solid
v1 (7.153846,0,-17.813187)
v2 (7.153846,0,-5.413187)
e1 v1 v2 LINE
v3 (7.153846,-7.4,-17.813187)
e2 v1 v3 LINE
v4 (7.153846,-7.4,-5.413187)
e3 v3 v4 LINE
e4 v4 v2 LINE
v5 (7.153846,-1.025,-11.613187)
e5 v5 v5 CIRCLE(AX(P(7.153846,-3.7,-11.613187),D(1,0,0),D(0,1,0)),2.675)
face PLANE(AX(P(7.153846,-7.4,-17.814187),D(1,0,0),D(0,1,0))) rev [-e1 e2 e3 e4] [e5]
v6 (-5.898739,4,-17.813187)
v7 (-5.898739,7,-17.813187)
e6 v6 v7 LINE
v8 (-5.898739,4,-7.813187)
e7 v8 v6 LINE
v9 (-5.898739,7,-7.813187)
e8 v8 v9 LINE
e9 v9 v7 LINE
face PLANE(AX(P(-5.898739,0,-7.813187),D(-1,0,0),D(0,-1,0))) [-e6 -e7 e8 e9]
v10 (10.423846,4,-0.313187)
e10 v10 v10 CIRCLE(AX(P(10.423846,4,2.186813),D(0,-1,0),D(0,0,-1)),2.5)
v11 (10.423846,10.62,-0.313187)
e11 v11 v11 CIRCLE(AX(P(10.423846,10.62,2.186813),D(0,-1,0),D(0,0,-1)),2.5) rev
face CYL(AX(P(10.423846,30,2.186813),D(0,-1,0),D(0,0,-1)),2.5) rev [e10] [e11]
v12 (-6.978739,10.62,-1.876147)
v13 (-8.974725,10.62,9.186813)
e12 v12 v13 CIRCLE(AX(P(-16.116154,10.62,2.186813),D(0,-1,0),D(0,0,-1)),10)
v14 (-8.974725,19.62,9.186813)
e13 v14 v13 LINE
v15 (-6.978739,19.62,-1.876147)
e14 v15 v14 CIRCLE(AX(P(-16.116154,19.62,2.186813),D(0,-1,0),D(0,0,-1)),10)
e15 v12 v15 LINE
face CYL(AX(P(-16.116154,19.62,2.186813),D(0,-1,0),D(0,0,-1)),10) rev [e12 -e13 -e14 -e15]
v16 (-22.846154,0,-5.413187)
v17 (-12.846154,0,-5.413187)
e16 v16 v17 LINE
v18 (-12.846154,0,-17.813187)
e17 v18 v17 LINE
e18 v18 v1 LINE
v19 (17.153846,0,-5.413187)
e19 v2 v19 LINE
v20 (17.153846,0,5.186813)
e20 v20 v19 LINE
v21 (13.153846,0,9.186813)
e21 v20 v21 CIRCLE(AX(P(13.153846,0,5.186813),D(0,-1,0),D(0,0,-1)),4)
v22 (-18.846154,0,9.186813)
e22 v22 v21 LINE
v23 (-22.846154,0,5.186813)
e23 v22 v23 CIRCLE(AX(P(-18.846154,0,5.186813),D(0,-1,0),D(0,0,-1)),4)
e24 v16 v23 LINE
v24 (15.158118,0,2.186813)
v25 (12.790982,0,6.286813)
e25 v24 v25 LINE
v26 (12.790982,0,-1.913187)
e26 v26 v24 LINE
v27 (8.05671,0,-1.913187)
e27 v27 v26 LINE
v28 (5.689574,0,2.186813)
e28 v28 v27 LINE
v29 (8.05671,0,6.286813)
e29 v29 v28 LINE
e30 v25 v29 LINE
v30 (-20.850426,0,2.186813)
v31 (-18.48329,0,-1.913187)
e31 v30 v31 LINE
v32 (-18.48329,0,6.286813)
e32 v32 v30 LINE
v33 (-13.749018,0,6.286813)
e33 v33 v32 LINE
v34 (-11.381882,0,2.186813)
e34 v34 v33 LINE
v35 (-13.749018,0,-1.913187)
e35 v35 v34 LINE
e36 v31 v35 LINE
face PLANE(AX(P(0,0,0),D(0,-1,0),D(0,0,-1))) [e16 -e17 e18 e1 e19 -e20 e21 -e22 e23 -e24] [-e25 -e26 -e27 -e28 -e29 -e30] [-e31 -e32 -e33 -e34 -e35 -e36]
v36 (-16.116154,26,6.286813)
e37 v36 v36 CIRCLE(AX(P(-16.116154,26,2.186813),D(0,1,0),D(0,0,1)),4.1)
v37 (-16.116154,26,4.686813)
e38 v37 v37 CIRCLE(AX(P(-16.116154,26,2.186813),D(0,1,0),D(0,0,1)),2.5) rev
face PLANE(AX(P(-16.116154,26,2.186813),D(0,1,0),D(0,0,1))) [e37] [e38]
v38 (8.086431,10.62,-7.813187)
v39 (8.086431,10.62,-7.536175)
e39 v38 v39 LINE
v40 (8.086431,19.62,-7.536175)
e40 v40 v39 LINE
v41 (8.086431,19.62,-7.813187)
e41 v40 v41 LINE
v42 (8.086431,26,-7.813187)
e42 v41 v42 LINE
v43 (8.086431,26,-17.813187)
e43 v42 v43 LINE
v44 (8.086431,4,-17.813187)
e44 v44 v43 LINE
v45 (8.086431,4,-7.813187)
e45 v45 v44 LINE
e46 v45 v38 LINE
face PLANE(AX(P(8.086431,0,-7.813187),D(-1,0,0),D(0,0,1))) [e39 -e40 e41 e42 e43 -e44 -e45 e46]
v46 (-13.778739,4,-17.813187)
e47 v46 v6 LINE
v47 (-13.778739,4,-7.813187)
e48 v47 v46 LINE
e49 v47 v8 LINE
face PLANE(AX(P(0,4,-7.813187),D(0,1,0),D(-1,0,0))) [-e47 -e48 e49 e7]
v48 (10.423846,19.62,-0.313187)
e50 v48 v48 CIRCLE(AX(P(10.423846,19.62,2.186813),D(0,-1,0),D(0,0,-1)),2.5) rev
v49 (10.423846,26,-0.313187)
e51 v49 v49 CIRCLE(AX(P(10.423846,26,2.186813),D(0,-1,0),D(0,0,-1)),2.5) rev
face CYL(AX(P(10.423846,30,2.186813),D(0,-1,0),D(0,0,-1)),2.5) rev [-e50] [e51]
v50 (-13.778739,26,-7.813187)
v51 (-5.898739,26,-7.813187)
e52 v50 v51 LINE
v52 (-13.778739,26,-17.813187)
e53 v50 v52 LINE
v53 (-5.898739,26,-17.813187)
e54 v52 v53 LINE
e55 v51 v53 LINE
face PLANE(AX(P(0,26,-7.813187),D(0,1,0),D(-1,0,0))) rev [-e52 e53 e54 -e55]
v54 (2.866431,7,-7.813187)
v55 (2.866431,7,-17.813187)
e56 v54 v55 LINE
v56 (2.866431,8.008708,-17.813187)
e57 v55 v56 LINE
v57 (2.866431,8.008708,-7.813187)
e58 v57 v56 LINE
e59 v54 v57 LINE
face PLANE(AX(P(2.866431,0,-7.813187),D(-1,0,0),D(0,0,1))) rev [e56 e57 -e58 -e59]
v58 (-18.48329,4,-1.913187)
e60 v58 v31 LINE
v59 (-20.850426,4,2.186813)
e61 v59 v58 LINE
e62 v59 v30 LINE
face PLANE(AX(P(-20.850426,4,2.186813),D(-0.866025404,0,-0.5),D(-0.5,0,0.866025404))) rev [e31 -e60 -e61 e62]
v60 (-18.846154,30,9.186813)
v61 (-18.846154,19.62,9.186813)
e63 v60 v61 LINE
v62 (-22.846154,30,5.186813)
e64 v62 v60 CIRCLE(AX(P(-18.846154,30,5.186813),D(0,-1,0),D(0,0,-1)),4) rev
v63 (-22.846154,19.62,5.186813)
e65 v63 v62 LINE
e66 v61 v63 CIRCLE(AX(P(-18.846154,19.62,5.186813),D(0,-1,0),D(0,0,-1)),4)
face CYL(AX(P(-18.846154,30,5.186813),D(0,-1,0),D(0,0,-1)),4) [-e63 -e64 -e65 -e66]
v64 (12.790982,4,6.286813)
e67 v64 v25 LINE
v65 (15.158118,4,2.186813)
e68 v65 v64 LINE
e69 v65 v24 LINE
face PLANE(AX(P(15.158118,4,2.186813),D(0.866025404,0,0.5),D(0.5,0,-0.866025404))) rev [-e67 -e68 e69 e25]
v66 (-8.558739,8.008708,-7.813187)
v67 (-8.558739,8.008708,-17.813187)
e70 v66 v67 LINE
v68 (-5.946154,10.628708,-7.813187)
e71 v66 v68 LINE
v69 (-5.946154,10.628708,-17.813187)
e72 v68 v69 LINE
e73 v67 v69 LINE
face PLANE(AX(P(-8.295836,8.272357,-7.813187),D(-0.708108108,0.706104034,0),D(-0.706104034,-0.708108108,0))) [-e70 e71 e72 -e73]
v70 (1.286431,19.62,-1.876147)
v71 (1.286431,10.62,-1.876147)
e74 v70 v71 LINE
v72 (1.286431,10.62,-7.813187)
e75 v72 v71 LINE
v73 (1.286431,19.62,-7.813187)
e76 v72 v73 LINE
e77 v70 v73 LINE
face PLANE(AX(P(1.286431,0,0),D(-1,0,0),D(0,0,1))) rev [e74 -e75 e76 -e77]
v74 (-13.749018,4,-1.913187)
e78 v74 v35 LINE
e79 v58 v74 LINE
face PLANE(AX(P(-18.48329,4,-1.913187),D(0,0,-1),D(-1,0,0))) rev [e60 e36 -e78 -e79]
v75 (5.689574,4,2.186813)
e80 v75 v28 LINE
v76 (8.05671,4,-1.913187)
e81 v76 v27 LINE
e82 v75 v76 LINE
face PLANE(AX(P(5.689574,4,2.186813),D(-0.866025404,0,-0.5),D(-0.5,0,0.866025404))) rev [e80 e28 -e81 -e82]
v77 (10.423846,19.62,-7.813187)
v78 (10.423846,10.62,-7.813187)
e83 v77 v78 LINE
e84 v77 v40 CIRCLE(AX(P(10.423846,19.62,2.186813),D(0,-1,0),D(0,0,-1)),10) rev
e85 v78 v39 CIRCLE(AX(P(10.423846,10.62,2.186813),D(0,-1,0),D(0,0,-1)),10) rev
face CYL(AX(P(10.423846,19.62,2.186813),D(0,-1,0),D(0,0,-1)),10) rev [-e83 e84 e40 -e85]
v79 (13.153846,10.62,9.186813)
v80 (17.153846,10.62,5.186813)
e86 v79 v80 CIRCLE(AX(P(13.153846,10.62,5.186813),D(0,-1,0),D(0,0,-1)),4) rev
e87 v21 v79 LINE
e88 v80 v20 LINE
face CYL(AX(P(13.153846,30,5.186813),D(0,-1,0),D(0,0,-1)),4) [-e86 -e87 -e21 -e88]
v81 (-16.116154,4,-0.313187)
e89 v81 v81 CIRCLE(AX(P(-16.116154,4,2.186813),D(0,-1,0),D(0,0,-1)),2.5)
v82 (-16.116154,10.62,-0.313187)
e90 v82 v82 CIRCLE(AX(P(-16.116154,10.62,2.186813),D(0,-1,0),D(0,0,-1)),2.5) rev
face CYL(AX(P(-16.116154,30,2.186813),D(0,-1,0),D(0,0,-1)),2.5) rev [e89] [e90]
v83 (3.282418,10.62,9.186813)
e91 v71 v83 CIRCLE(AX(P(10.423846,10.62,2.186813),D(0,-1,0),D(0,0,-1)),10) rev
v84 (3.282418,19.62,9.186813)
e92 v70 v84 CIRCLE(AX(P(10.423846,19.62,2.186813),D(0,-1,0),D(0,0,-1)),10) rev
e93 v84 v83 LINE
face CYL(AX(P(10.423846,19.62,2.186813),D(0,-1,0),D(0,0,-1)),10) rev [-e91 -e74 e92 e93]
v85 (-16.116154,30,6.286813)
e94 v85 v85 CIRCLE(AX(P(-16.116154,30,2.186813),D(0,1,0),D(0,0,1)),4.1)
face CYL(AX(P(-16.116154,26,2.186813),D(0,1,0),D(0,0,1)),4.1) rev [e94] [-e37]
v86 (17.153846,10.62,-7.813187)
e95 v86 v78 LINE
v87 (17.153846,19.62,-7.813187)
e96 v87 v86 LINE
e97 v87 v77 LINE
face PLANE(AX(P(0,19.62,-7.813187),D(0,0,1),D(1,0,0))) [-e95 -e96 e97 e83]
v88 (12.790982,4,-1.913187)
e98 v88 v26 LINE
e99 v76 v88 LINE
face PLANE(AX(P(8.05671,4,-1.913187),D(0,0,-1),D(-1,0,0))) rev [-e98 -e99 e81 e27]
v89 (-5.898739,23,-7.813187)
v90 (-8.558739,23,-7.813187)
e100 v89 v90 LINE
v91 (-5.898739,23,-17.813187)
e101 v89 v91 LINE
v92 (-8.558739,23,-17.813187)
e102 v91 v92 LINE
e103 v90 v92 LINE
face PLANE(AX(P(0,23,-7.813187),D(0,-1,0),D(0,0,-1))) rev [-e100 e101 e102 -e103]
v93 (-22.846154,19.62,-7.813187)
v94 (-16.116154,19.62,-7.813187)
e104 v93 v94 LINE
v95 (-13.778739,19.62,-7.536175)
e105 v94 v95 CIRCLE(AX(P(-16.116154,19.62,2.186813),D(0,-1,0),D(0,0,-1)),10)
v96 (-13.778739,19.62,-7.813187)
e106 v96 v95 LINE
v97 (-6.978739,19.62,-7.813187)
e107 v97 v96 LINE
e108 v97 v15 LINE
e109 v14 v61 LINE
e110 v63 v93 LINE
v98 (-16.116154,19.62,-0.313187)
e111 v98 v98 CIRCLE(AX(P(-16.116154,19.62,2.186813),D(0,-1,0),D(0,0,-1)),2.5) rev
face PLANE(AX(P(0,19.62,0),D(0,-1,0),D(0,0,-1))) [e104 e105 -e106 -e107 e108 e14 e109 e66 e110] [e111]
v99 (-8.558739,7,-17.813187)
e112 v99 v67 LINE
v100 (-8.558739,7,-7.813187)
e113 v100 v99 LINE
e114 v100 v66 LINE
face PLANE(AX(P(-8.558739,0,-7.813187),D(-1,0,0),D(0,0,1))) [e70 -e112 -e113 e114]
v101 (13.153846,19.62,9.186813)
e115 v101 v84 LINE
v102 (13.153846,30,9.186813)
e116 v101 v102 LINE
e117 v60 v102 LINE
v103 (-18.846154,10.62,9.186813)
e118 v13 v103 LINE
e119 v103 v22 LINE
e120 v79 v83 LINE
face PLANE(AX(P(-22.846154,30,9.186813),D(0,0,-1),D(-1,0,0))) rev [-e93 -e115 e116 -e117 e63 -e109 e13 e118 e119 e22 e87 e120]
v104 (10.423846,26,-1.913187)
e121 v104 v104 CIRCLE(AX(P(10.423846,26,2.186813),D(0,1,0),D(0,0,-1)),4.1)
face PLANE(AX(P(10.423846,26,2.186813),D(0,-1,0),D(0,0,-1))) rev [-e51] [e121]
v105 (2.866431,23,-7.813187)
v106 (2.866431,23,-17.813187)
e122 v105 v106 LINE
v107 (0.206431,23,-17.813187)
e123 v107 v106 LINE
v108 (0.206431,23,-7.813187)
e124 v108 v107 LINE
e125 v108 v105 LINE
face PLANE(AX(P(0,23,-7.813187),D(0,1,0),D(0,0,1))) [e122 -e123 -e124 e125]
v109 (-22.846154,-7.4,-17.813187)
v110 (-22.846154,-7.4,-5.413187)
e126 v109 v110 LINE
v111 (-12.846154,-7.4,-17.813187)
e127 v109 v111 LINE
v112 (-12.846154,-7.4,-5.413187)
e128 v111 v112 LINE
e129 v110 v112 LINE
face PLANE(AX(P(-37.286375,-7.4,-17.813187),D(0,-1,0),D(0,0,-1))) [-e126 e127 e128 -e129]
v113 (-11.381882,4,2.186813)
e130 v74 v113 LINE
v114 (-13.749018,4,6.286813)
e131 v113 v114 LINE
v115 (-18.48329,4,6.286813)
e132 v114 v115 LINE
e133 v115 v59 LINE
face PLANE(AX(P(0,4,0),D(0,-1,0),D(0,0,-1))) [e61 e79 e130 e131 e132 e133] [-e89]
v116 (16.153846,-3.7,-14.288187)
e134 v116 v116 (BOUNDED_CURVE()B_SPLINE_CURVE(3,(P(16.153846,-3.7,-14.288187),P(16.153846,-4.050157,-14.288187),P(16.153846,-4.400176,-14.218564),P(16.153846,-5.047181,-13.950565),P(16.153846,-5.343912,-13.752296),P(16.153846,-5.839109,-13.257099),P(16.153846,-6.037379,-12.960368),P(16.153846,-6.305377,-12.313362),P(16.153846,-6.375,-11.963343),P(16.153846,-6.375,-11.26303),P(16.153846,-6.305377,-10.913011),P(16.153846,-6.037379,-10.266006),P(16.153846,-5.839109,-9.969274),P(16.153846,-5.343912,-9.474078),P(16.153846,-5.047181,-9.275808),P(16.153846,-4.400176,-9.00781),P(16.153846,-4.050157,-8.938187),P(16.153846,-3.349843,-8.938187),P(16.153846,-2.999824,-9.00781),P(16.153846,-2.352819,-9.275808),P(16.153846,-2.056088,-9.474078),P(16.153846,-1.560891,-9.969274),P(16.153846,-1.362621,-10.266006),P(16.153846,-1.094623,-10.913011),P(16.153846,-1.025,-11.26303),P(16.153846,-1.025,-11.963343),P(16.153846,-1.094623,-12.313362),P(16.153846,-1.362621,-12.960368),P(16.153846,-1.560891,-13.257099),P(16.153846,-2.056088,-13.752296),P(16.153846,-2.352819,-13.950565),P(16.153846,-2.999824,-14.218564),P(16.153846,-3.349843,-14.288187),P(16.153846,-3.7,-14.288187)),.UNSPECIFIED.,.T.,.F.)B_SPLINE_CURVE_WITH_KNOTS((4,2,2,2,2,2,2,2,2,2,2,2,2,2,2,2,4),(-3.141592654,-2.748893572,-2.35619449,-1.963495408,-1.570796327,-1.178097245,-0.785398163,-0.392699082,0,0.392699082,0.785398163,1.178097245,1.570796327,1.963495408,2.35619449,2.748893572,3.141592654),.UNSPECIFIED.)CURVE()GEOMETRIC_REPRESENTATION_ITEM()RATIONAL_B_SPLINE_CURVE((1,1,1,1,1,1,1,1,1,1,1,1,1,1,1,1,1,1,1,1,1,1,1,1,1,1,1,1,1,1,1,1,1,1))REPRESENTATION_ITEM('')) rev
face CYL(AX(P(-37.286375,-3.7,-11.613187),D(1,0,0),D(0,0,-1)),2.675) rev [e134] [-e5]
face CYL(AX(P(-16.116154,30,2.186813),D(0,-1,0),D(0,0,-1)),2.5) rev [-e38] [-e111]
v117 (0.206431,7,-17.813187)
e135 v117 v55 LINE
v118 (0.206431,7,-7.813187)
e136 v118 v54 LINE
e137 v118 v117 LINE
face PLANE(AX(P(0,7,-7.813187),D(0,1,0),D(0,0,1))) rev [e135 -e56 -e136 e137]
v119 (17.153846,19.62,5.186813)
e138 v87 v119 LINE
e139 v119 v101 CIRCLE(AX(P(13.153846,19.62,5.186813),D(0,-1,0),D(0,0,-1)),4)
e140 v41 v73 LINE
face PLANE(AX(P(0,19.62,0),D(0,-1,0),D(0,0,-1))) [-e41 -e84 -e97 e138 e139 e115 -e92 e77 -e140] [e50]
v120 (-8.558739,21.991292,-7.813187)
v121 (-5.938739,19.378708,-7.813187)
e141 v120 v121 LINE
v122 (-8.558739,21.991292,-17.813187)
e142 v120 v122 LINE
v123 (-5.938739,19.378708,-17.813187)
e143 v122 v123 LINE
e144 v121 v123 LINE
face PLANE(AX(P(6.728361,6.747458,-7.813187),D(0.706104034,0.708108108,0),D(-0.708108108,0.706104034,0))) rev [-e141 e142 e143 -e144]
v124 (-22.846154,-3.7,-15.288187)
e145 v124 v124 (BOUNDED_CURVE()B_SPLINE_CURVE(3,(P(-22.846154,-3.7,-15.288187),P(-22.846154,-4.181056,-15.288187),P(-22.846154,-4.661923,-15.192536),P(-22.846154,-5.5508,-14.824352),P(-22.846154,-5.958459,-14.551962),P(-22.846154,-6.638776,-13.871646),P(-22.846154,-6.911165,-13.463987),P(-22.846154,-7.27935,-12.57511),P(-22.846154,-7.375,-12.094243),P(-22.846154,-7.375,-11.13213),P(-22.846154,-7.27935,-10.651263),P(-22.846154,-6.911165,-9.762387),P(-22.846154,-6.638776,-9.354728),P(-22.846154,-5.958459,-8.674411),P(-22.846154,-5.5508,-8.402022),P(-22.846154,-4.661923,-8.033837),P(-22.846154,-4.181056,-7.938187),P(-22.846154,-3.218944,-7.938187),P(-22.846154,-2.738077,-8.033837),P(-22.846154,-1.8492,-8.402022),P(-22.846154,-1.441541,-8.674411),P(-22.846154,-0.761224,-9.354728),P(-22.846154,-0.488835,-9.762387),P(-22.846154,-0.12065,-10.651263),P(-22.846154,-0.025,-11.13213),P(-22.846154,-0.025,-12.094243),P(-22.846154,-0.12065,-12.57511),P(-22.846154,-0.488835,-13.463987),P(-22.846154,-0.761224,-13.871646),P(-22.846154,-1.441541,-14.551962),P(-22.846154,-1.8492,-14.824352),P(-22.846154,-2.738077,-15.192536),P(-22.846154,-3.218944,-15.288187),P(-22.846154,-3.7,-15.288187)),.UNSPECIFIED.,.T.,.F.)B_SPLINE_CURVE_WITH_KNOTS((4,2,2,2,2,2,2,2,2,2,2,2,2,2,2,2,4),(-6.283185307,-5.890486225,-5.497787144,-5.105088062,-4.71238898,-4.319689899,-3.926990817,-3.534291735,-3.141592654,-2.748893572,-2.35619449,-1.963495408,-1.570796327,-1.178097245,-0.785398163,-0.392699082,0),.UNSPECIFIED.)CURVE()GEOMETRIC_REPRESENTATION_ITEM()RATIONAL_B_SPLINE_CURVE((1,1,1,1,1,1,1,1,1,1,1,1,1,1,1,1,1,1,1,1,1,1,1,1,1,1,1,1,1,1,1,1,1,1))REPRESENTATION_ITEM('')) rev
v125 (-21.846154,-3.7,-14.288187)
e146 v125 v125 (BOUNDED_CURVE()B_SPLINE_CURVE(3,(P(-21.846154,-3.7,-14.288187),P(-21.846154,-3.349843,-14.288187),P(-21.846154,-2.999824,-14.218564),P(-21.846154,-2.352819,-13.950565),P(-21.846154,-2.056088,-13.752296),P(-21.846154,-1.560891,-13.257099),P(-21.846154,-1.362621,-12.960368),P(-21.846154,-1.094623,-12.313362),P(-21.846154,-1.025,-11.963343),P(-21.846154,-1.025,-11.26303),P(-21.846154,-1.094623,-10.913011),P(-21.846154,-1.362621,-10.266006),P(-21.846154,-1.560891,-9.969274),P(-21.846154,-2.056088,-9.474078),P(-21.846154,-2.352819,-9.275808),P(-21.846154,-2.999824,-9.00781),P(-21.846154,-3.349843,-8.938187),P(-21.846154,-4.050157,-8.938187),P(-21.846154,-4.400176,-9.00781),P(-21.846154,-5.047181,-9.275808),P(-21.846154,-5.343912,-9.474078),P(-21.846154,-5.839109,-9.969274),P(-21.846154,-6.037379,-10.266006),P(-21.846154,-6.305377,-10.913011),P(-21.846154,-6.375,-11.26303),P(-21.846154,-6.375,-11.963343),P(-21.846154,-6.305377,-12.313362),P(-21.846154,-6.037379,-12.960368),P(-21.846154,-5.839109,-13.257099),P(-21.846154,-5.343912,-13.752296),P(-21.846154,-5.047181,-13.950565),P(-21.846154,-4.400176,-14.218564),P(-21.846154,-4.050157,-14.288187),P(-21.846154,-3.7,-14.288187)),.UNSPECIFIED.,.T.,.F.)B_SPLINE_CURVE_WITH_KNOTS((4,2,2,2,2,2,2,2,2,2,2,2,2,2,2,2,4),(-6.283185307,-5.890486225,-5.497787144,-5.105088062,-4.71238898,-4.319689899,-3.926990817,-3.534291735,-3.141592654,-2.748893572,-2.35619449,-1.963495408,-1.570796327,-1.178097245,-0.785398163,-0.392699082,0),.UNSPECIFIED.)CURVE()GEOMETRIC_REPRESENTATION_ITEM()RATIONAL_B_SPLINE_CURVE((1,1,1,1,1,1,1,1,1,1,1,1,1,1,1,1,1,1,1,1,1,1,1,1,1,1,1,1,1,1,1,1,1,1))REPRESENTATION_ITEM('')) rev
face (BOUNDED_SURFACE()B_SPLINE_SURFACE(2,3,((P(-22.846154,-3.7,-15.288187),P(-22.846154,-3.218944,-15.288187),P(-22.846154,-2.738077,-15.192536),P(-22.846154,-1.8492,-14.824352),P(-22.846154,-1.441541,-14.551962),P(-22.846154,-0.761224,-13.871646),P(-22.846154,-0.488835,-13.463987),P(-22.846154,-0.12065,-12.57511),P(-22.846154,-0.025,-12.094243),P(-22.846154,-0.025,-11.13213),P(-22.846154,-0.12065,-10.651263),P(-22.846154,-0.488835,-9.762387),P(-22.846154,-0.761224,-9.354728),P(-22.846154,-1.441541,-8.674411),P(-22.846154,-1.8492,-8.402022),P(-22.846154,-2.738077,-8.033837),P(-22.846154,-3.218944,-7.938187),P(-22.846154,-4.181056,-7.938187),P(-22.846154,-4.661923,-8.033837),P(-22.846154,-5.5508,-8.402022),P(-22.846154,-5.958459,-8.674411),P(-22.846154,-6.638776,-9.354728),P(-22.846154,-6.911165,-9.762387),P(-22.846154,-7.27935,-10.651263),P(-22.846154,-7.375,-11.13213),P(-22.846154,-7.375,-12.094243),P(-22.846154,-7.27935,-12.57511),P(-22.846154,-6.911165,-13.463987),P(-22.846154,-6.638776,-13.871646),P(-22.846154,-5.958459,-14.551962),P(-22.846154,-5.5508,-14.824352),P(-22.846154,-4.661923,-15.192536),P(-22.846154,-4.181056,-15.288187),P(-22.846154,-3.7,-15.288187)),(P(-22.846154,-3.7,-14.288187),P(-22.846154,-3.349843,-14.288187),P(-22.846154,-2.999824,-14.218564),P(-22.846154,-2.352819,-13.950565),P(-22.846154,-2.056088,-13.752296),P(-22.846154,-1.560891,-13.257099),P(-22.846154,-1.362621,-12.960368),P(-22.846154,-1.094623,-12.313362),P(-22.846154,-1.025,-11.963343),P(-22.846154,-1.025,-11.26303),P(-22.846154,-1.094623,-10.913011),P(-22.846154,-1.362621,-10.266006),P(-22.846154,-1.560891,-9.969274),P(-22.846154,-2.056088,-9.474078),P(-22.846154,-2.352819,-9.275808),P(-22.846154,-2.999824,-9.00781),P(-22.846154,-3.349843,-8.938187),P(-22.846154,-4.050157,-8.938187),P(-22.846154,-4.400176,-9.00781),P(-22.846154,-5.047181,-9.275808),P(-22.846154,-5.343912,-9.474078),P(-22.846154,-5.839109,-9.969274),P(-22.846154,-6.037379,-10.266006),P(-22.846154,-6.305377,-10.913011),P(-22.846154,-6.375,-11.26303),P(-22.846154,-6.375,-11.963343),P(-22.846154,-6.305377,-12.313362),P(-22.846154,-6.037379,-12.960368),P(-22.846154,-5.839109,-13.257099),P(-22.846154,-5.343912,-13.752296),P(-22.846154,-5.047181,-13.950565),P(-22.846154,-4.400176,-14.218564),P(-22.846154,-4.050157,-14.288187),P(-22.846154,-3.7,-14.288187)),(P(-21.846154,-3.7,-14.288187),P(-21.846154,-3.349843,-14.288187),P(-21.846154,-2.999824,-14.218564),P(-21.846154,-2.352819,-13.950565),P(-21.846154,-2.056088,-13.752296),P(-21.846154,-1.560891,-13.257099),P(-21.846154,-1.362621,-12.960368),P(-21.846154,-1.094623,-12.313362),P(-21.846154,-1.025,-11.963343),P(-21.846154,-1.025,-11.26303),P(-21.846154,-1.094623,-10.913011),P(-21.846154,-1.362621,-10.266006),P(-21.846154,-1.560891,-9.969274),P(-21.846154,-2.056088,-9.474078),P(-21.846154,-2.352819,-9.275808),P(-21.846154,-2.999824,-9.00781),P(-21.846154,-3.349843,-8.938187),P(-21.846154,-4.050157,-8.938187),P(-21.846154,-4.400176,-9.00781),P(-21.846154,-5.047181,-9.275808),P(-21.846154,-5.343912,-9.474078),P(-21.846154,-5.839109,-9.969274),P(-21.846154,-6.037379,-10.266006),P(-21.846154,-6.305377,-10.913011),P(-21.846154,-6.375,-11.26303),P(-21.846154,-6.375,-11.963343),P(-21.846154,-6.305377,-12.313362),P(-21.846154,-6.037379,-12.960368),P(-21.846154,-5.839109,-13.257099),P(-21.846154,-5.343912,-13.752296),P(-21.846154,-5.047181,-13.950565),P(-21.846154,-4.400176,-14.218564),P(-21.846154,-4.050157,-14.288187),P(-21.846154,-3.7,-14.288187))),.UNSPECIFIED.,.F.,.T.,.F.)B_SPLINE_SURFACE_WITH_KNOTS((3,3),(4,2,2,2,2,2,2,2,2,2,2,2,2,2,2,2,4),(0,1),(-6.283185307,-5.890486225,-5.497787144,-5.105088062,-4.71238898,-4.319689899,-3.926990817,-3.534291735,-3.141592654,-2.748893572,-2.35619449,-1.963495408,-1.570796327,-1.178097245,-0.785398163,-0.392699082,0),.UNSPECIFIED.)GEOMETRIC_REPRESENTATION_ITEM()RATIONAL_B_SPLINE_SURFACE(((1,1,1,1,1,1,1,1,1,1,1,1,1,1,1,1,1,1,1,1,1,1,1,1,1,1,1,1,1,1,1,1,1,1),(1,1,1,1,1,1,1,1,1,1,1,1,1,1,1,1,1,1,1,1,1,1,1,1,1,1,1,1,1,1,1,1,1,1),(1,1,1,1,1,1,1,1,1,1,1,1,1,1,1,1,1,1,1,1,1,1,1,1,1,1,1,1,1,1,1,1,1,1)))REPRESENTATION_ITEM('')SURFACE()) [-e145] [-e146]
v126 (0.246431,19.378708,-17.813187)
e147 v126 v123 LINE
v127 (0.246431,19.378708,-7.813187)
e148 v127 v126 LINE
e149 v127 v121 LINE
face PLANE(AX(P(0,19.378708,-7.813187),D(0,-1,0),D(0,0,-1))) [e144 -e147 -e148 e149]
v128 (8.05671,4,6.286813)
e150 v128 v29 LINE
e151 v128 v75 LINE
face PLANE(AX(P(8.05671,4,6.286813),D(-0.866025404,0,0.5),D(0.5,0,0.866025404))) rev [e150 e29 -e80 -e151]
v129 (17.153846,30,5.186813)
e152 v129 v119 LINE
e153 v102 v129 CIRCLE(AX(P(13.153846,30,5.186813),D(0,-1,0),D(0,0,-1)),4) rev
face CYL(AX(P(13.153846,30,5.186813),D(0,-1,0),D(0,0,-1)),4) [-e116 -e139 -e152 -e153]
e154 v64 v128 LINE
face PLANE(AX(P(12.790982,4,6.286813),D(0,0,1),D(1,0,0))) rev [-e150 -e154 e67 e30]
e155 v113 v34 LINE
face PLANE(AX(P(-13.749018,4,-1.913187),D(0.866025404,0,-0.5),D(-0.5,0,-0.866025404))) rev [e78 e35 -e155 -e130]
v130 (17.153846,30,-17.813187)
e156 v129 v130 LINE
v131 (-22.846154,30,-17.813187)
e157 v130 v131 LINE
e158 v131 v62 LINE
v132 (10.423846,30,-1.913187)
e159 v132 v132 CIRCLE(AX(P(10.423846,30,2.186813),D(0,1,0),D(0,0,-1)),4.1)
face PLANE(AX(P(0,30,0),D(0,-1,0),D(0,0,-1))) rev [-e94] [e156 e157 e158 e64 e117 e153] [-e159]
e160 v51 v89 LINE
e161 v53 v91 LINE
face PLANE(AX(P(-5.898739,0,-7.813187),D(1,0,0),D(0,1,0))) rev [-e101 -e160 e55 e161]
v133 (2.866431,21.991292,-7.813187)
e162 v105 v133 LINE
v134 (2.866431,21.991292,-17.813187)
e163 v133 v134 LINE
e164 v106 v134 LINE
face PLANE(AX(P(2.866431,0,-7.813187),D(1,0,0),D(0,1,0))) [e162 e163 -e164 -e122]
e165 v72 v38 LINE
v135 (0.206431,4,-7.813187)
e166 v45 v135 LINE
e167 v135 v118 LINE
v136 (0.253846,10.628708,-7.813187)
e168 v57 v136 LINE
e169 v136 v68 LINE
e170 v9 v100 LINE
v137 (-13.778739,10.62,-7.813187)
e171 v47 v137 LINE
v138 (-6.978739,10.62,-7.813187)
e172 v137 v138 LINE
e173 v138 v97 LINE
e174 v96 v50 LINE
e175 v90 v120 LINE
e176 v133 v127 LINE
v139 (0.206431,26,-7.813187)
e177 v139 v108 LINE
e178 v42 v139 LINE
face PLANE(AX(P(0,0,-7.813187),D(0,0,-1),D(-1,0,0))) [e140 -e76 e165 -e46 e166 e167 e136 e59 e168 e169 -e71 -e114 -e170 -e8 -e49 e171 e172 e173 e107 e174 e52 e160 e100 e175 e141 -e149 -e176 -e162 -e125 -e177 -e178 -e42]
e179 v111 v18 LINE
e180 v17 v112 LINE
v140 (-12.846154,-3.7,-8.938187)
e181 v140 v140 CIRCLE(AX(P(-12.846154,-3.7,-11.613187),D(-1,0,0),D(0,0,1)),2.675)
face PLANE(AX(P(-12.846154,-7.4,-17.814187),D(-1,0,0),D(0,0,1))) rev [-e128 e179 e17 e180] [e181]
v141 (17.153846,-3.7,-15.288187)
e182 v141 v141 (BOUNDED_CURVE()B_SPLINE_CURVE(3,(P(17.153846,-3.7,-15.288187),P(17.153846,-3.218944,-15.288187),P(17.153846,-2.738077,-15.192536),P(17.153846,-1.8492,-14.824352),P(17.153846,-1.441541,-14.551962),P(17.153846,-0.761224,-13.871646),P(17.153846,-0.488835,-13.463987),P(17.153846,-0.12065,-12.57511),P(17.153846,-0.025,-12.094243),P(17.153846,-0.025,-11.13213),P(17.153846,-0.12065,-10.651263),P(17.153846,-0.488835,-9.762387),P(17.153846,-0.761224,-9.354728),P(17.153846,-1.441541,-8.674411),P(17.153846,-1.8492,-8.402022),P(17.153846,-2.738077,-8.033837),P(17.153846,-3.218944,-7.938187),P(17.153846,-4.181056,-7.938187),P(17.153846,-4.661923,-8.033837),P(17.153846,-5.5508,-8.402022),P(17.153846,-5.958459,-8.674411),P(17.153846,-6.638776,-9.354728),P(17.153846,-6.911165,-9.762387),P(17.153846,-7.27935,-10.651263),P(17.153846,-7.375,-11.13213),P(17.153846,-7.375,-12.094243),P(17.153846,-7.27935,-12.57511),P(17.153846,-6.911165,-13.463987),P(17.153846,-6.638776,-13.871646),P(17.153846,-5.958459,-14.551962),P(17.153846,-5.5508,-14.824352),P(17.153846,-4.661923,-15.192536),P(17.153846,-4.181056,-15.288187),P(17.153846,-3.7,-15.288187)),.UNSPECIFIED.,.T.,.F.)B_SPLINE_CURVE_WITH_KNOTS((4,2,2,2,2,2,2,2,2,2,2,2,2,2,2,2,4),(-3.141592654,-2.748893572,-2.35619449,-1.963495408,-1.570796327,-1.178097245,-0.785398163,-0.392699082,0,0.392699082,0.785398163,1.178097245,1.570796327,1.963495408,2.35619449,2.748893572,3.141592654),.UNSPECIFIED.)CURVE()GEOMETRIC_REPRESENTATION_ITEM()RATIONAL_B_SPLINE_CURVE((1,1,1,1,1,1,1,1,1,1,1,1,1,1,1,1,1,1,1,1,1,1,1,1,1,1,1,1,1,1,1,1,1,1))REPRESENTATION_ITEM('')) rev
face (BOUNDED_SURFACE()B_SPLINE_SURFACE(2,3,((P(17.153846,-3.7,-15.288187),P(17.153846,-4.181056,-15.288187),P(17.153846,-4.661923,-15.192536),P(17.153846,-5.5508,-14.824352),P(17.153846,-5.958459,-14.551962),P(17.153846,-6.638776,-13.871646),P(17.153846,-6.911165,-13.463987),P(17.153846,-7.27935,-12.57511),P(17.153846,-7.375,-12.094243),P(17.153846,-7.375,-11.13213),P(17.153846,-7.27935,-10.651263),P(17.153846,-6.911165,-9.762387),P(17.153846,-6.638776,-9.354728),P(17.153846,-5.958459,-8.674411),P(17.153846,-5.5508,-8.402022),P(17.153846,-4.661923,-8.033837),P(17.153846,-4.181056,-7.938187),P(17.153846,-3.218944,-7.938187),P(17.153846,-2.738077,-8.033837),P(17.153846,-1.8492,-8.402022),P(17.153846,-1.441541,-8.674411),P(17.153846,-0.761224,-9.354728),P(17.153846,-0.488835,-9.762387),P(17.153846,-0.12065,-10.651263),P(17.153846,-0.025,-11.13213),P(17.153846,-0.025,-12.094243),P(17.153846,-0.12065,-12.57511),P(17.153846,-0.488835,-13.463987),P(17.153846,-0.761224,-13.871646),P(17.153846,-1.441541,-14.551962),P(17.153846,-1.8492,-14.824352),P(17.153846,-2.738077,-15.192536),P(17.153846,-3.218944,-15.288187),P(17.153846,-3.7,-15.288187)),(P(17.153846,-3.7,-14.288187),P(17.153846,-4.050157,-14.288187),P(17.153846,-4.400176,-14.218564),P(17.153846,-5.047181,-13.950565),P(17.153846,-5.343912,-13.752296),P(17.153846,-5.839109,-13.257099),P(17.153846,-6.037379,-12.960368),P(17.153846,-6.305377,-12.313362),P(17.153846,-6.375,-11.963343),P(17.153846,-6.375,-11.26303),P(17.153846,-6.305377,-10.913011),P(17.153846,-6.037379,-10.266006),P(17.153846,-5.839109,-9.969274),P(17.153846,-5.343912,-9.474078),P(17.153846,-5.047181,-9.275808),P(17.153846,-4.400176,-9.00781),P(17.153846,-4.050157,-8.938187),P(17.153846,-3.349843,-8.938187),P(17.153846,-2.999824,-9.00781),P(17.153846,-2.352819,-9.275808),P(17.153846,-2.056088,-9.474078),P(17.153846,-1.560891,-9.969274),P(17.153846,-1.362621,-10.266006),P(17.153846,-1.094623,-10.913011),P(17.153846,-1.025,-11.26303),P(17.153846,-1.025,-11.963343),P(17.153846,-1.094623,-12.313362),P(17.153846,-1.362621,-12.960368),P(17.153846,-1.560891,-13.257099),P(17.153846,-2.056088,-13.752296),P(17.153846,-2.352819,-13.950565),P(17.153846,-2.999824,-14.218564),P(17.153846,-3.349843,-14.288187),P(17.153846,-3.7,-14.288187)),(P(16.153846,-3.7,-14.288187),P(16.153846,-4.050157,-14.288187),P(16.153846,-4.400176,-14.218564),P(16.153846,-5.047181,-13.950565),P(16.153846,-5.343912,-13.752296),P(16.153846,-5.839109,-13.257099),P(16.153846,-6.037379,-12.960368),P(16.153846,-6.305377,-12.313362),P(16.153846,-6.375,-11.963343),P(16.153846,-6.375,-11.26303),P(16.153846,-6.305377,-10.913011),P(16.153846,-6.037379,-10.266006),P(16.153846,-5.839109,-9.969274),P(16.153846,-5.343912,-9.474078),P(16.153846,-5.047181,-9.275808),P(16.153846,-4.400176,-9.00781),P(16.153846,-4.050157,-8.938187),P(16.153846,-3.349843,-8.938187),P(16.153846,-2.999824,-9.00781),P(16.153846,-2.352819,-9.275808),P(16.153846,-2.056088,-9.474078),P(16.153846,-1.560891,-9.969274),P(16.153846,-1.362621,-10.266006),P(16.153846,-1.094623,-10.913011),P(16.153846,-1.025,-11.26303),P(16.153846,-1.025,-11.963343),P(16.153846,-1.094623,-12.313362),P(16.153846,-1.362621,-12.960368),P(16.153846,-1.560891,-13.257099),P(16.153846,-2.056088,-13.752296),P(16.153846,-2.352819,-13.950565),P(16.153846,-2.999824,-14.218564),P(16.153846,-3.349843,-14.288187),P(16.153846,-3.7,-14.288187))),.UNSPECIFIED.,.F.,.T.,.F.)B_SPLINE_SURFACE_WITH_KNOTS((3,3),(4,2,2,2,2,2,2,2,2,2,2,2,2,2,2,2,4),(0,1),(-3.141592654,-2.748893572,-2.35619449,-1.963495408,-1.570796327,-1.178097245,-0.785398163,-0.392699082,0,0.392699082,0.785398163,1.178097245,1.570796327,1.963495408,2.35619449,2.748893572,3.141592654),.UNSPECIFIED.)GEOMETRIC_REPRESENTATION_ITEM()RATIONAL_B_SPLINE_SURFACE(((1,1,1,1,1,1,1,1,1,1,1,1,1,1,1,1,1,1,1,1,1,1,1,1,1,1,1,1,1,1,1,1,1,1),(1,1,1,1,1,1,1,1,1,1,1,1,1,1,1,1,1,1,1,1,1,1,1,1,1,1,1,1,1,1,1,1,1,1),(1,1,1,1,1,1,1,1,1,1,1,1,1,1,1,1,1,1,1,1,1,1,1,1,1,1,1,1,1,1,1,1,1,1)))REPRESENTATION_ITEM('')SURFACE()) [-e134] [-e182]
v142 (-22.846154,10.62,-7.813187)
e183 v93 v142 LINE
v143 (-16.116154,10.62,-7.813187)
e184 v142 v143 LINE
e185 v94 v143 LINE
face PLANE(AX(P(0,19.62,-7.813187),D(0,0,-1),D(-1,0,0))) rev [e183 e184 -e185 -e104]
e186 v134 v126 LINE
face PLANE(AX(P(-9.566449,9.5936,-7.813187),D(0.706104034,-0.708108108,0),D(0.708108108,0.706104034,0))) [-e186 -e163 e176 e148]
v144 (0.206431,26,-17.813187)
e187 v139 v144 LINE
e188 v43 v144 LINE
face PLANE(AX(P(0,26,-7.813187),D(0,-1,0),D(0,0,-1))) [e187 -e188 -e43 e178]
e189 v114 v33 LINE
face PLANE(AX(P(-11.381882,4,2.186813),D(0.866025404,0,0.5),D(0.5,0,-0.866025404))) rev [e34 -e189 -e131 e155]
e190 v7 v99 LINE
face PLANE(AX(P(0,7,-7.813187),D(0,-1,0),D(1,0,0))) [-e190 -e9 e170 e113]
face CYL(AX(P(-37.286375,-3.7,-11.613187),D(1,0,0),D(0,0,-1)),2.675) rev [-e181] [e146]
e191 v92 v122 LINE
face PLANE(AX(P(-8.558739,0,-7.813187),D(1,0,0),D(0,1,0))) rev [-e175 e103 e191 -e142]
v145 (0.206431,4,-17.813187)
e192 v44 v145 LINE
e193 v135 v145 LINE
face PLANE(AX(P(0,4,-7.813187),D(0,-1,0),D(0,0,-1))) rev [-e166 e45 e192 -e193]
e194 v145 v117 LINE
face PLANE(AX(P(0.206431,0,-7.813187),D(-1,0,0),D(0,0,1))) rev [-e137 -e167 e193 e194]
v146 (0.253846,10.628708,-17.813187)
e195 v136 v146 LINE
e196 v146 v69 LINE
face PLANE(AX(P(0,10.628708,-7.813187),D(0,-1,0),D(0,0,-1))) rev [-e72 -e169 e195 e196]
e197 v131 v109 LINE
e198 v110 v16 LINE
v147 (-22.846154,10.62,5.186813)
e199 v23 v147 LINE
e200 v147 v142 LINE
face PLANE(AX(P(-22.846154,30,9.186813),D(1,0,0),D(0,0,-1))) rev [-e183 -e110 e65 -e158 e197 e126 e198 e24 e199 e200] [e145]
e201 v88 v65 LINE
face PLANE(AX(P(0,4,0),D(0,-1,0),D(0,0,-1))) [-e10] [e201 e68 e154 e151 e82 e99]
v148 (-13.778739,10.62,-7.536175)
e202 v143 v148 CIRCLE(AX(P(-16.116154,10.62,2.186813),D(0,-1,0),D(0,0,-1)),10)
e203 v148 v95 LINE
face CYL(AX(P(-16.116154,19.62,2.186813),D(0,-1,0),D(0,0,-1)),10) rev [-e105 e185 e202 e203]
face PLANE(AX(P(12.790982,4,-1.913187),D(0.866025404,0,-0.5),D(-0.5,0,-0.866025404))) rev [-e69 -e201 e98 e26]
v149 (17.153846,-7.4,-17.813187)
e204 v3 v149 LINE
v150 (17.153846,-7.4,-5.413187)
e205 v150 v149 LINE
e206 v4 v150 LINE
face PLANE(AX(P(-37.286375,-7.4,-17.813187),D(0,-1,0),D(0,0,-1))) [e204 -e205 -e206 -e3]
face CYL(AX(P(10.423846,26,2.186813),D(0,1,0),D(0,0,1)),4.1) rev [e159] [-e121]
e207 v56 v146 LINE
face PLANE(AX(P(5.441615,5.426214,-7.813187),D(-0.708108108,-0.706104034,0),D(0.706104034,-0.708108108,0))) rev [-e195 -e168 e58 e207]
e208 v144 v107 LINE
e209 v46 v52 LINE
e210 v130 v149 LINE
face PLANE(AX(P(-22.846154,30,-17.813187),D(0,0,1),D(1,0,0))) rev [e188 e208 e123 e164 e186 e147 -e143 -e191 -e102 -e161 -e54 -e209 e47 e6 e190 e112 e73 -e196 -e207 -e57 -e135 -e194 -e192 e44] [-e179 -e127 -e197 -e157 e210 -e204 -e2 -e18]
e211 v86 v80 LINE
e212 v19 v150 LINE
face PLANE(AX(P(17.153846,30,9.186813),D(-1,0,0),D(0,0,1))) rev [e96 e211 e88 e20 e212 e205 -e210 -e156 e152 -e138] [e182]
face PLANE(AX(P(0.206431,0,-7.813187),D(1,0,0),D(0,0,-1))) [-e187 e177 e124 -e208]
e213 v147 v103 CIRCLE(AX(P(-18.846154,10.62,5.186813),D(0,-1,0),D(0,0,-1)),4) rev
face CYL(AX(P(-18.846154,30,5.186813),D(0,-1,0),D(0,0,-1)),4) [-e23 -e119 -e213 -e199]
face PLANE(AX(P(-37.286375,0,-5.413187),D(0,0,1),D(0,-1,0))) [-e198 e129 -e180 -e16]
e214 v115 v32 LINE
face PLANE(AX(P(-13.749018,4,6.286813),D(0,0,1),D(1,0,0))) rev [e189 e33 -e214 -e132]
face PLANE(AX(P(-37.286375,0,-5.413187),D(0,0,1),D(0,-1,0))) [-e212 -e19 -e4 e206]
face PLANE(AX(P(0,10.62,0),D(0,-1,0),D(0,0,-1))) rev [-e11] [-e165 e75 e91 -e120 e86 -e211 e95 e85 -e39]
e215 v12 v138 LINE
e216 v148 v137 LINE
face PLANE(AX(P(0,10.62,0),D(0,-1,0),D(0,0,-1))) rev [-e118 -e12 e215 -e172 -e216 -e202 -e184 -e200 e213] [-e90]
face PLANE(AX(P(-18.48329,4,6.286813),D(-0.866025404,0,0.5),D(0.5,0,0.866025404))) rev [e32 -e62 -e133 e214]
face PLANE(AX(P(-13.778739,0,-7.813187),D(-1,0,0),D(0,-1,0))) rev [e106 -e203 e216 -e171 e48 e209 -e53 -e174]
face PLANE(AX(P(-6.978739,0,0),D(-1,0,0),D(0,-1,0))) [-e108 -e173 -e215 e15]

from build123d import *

# Parameters (mm, degrees)
SKETCH1_W           = 40
SKETCH1_H           = 27
BOSS_EXTRUDE1_DEPTH = 30
CUT_EXTRUDE1_DEPTH  = 10
SKETCH3_R           = 2.5
CUT_EXTRUDE2_DEPTH  = 30
CUT_EXTRUDE5_START  = -10.62
CUT_EXTRUDE5_DEPTH  = 9
SKETCH10_W          = 20
SKETCH10_H          = 9
CUT_EXTRUDE7_DEPTH  = 6.8
SKETCH12_W          = 20
SKETCH12_H          = 9
CUT_EXTRUDE10_DEPTH = 6.8
FILLET1_R           = 4
SKETCH13_W          = 12.4
SKETCH13_H          = 7.4
SKETCH13_R          = 2.675
BOSS_EXTRUDE2_DEPTH = 40
CUT_EXTRUDE11_REACH = 42.436
SKETCH14_W          = 20
SKETCH14_H          = 7.4
SKETCH15_R          = 4.1
CUT_EXTRUDE12_DEPTH = 4
SKETCH16_R          = 2.5
CUT_EXTRUDE13_DEPTH = 4
FILLET2_SIZE        = 1


with BuildPart() as part:
    # Sketch1 → Boss-Extrude1 (new body)
    with BuildSketch(Plane(origin=(0, 0, 0), x_dir=(1, 0, 0), z_dir=(0, 1, 0))):
        with Locations((-2.846153846, 4.313186813)):
            Rectangle(SKETCH1_W, SKETCH1_H)
    extrude(amount=BOSS_EXTRUDE1_DEPTH)

    # Sketch2 → Cut-Extrude1 (cut)
    with BuildSketch(Plane(origin=(0, 0, -17.813186813), x_dir=(-1, 0, 0), z_dir=(0, 0, -1))):
        Polygon((-8.086431081, 26), (-8.086431081, 4), (-0.206431081, 4), (-0.206431081, 7), (-2.866431081, 7), (-2.866431081, 8.008707537), (-0.253846154, 10.628707537), (5.946153846, 10.628707537), (8.558738773, 8.008707537), (8.558738773, 7), (5.898738773, 7), (5.898738773, 4), (13.778738773, 4), (13.778738773, 26), (5.898738773, 26), (5.898738773, 23), (8.558738773, 23), (8.558738773, 21.991292463), (5.938738773, 19.378707537), (-0.246431081, 19.378707537), (-2.866431081, 21.991292463), (-2.866431081, 23), (-0.206431081, 23), (-0.206431081, 26), align=None)
    extrude(amount=-CUT_EXTRUDE1_DEPTH, mode=Mode.SUBTRACT)

    # Sketch3 → Cut-Extrude2 (cut)
    with BuildSketch(Plane.XZ):
        with Locations(Location((10.423846154, 2.186813187, 0), (0, 0, 270))):
            Circle(SKETCH3_R)
        with Locations(Location((-16.116153846, 2.186813187, 0), (0, 0, 90))):
            Circle(SKETCH3_R)
    extrude(amount=-CUT_EXTRUDE2_DEPTH, mode=Mode.SUBTRACT)

    # Sketch8 → Cut-Extrude5 (cut)
    with BuildSketch(Plane.XZ.offset(CUT_EXTRUDE5_START)):
        with BuildLine():
            Line((3.282417725, 9.186813187), (17.153846154, 9.186813187))
            Line((17.153846154, 9.186813187), (17.153846154, -7.813186813))
            Line((17.153846154, -7.813186813), (10.423846154, -7.813186813))
            ThreePointArc((10.423846154, -7.813186813), (1.204301697, -1.686170159), (3.282417725, 9.186813187))
        make_face()
        with BuildLine():
            Line((-22.846153846, -7.813186813), (-16.116153846, -7.813186813))
            ThreePointArc((-16.116153846, -7.813186813), (-6.896609389, -1.686170159), (-8.974725418, 9.186813187))
            Line((-8.974725418, 9.186813187), (-22.846153846, 9.186813187))
            Line((-22.846153846, 9.186813187), (-22.846153846, -7.813186813))
        make_face()
    extrude(amount=-CUT_EXTRUDE5_DEPTH, mode=Mode.SUBTRACT)

    # Sketch10 → Cut-Extrude7 (cut)
    with BuildSketch(Plane.ZY.offset(-8.086431081)):
        with Locations((-7.813186813, 15.12)):
            Rectangle(SKETCH10_W, SKETCH10_H)
    extrude(amount=CUT_EXTRUDE7_DEPTH, mode=Mode.SUBTRACT)

    # Sketch12 → Cut-Extrude10 (cut)
    with BuildSketch(Plane(origin=(-13.778738773, 0, 0), x_dir=(0, 0, -1), z_dir=(1, 0, 0))):
        with Locations((7.813186813, 15.12)):
            Rectangle(SKETCH12_W, SKETCH12_H)
    extrude(amount=CUT_EXTRUDE10_DEPTH, mode=Mode.SUBTRACT)

    # Fillet1
    fillet1_edges = [part.edges().sort_by_distance(p)[0] for p in [
        (17.153846154, 24.81, 9.186813187),
        (-22.846153846, 24.81, 9.186813187),
        (17.153846154, 5.31, 9.186813187),
        (-22.846153846, 5.31, 9.186813187),
    ]]
    fillet(fillet1_edges, radius=FILLET1_R)

    # Sketch13 → Boss-Extrude2 (add)
    with BuildSketch(Plane(origin=(17.153846154, 0, 0), x_dir=(0, 0, -1), z_dir=(1, 0, 0))):
        with Locations((11.613186813, -3.7)):
            Rectangle(SKETCH13_W, SKETCH13_H)
        with Locations((11.613186813, -3.7)):
            Circle(SKETCH13_R, mode=Mode.SUBTRACT)
    extrude(amount=-BOSS_EXTRUDE2_DEPTH)

    # Sketch14 → Cut-Extrude11 (cut, up to next)
    with BuildSketch(Plane.XY.offset(-5.413186813), mode=Mode.PRIVATE) as cut_extrude11_sk1:
        with Locations((-2.846153846, -3.7)):
            Rectangle(SKETCH14_W, SKETCH14_H)
    cut_extrude11_tool1 = extrude(cut_extrude11_sk1.sketch, amount=-CUT_EXTRUDE11_REACH, mode=Mode.PRIVATE) & part.part
    add(cut_extrude11_tool1.solids().sort_by_distance((-2.846154, -3.7, -5.413187))[0], mode=Mode.SUBTRACT)

    # Sketch15 → Cut-Extrude12 (cut)
    with BuildSketch(Plane(origin=(0, 30, 0), x_dir=(1, 0, 0), z_dir=(0, 1, 0))):
        with Locations(Location((-16.116153846, -2.186813187, 0), (0, 0, 270))):
            Circle(SKETCH15_R)
        with Locations(Location((10.423846154, -2.186813187, 0), (0, 0, 90))):
            Circle(SKETCH15_R)
    extrude(amount=-CUT_EXTRUDE12_DEPTH, mode=Mode.SUBTRACT)

    # Sketch16 → Cut-Extrude13 (cut)
    # profile 1 of 2: a face of its own
    with BuildSketch(Plane.XZ):
        Polygon((-13.749017742, -1.913186813), (-11.381881639, 2.186813187), (-13.749017742, 6.286813187), (-18.48328995, 6.286813187), (-20.850426054, 2.186813187), (-18.48328995, -1.913186813), align=None)
        with Locations(Location((-16.116153846, 2.186813187, 0), (0, 0, 270))):
            Circle(SKETCH16_R, mode=Mode.SUBTRACT)
    # profile 2 of 2: a face of its own
    with BuildSketch(Plane.XZ):
        Polygon((12.790982258, -1.913186813), (15.158118361, 2.186813187), (12.790982258, 6.286813187), (8.05671005, 6.286813187), (5.689573946, 2.186813187), (8.05671005, -1.913186813), align=None)
        with Locations(Location((10.423846154, 2.186813187, 0), (0, 0, 270))):
            Circle(SKETCH16_R, mode=Mode.SUBTRACT)
    extrude(amount=-CUT_EXTRUDE13_DEPTH, mode=Mode.SUBTRACT)

    # Fillet2
    # a fillet whose section is not a circle: 1 mm, written as the material it takes off along each edge
    with BuildSketch(Plane(origin=(-22.846153846, -3.7, -11.613186813), x_dir=(0, 0, -1), z_dir=(0, -1, 0))) as fillet2_piece_1:
        with BuildLine():
            Bezier((2.675, FILLET2_SIZE), (2.675, 0), (2.675 + FILLET2_SIZE, 0), weights=[1, 1, 1])
            Line((2.675 + FILLET2_SIZE, 0), (2.675, 0))
            Line((2.675, 0), (2.675, FILLET2_SIZE))
        make_face()
    revolve(axis=Axis((-22.846153846, -3.7, -11.613186813), (1, 0, 0)), mode=Mode.SUBTRACT)
    with BuildSketch(Plane(origin=(17.153846154, -3.7, -11.613186813), x_dir=(0, 0, -1), z_dir=(0, -1, 0))) as fillet2_piece_2:
        with BuildLine():
            Bezier((2.675, -FILLET2_SIZE), (2.675, 0), (2.675 + FILLET2_SIZE, 0), weights=[1, 1, 1])
            Line((2.675 + FILLET2_SIZE, 0), (2.675, 0))
            Line((2.675, 0), (2.675, -FILLET2_SIZE))
        make_face()
    revolve(axis=Axis((17.153846154, -3.7, -11.613186813), (1, 0, 0)), mode=Mode.SUBTRACT)


solid = part.part
